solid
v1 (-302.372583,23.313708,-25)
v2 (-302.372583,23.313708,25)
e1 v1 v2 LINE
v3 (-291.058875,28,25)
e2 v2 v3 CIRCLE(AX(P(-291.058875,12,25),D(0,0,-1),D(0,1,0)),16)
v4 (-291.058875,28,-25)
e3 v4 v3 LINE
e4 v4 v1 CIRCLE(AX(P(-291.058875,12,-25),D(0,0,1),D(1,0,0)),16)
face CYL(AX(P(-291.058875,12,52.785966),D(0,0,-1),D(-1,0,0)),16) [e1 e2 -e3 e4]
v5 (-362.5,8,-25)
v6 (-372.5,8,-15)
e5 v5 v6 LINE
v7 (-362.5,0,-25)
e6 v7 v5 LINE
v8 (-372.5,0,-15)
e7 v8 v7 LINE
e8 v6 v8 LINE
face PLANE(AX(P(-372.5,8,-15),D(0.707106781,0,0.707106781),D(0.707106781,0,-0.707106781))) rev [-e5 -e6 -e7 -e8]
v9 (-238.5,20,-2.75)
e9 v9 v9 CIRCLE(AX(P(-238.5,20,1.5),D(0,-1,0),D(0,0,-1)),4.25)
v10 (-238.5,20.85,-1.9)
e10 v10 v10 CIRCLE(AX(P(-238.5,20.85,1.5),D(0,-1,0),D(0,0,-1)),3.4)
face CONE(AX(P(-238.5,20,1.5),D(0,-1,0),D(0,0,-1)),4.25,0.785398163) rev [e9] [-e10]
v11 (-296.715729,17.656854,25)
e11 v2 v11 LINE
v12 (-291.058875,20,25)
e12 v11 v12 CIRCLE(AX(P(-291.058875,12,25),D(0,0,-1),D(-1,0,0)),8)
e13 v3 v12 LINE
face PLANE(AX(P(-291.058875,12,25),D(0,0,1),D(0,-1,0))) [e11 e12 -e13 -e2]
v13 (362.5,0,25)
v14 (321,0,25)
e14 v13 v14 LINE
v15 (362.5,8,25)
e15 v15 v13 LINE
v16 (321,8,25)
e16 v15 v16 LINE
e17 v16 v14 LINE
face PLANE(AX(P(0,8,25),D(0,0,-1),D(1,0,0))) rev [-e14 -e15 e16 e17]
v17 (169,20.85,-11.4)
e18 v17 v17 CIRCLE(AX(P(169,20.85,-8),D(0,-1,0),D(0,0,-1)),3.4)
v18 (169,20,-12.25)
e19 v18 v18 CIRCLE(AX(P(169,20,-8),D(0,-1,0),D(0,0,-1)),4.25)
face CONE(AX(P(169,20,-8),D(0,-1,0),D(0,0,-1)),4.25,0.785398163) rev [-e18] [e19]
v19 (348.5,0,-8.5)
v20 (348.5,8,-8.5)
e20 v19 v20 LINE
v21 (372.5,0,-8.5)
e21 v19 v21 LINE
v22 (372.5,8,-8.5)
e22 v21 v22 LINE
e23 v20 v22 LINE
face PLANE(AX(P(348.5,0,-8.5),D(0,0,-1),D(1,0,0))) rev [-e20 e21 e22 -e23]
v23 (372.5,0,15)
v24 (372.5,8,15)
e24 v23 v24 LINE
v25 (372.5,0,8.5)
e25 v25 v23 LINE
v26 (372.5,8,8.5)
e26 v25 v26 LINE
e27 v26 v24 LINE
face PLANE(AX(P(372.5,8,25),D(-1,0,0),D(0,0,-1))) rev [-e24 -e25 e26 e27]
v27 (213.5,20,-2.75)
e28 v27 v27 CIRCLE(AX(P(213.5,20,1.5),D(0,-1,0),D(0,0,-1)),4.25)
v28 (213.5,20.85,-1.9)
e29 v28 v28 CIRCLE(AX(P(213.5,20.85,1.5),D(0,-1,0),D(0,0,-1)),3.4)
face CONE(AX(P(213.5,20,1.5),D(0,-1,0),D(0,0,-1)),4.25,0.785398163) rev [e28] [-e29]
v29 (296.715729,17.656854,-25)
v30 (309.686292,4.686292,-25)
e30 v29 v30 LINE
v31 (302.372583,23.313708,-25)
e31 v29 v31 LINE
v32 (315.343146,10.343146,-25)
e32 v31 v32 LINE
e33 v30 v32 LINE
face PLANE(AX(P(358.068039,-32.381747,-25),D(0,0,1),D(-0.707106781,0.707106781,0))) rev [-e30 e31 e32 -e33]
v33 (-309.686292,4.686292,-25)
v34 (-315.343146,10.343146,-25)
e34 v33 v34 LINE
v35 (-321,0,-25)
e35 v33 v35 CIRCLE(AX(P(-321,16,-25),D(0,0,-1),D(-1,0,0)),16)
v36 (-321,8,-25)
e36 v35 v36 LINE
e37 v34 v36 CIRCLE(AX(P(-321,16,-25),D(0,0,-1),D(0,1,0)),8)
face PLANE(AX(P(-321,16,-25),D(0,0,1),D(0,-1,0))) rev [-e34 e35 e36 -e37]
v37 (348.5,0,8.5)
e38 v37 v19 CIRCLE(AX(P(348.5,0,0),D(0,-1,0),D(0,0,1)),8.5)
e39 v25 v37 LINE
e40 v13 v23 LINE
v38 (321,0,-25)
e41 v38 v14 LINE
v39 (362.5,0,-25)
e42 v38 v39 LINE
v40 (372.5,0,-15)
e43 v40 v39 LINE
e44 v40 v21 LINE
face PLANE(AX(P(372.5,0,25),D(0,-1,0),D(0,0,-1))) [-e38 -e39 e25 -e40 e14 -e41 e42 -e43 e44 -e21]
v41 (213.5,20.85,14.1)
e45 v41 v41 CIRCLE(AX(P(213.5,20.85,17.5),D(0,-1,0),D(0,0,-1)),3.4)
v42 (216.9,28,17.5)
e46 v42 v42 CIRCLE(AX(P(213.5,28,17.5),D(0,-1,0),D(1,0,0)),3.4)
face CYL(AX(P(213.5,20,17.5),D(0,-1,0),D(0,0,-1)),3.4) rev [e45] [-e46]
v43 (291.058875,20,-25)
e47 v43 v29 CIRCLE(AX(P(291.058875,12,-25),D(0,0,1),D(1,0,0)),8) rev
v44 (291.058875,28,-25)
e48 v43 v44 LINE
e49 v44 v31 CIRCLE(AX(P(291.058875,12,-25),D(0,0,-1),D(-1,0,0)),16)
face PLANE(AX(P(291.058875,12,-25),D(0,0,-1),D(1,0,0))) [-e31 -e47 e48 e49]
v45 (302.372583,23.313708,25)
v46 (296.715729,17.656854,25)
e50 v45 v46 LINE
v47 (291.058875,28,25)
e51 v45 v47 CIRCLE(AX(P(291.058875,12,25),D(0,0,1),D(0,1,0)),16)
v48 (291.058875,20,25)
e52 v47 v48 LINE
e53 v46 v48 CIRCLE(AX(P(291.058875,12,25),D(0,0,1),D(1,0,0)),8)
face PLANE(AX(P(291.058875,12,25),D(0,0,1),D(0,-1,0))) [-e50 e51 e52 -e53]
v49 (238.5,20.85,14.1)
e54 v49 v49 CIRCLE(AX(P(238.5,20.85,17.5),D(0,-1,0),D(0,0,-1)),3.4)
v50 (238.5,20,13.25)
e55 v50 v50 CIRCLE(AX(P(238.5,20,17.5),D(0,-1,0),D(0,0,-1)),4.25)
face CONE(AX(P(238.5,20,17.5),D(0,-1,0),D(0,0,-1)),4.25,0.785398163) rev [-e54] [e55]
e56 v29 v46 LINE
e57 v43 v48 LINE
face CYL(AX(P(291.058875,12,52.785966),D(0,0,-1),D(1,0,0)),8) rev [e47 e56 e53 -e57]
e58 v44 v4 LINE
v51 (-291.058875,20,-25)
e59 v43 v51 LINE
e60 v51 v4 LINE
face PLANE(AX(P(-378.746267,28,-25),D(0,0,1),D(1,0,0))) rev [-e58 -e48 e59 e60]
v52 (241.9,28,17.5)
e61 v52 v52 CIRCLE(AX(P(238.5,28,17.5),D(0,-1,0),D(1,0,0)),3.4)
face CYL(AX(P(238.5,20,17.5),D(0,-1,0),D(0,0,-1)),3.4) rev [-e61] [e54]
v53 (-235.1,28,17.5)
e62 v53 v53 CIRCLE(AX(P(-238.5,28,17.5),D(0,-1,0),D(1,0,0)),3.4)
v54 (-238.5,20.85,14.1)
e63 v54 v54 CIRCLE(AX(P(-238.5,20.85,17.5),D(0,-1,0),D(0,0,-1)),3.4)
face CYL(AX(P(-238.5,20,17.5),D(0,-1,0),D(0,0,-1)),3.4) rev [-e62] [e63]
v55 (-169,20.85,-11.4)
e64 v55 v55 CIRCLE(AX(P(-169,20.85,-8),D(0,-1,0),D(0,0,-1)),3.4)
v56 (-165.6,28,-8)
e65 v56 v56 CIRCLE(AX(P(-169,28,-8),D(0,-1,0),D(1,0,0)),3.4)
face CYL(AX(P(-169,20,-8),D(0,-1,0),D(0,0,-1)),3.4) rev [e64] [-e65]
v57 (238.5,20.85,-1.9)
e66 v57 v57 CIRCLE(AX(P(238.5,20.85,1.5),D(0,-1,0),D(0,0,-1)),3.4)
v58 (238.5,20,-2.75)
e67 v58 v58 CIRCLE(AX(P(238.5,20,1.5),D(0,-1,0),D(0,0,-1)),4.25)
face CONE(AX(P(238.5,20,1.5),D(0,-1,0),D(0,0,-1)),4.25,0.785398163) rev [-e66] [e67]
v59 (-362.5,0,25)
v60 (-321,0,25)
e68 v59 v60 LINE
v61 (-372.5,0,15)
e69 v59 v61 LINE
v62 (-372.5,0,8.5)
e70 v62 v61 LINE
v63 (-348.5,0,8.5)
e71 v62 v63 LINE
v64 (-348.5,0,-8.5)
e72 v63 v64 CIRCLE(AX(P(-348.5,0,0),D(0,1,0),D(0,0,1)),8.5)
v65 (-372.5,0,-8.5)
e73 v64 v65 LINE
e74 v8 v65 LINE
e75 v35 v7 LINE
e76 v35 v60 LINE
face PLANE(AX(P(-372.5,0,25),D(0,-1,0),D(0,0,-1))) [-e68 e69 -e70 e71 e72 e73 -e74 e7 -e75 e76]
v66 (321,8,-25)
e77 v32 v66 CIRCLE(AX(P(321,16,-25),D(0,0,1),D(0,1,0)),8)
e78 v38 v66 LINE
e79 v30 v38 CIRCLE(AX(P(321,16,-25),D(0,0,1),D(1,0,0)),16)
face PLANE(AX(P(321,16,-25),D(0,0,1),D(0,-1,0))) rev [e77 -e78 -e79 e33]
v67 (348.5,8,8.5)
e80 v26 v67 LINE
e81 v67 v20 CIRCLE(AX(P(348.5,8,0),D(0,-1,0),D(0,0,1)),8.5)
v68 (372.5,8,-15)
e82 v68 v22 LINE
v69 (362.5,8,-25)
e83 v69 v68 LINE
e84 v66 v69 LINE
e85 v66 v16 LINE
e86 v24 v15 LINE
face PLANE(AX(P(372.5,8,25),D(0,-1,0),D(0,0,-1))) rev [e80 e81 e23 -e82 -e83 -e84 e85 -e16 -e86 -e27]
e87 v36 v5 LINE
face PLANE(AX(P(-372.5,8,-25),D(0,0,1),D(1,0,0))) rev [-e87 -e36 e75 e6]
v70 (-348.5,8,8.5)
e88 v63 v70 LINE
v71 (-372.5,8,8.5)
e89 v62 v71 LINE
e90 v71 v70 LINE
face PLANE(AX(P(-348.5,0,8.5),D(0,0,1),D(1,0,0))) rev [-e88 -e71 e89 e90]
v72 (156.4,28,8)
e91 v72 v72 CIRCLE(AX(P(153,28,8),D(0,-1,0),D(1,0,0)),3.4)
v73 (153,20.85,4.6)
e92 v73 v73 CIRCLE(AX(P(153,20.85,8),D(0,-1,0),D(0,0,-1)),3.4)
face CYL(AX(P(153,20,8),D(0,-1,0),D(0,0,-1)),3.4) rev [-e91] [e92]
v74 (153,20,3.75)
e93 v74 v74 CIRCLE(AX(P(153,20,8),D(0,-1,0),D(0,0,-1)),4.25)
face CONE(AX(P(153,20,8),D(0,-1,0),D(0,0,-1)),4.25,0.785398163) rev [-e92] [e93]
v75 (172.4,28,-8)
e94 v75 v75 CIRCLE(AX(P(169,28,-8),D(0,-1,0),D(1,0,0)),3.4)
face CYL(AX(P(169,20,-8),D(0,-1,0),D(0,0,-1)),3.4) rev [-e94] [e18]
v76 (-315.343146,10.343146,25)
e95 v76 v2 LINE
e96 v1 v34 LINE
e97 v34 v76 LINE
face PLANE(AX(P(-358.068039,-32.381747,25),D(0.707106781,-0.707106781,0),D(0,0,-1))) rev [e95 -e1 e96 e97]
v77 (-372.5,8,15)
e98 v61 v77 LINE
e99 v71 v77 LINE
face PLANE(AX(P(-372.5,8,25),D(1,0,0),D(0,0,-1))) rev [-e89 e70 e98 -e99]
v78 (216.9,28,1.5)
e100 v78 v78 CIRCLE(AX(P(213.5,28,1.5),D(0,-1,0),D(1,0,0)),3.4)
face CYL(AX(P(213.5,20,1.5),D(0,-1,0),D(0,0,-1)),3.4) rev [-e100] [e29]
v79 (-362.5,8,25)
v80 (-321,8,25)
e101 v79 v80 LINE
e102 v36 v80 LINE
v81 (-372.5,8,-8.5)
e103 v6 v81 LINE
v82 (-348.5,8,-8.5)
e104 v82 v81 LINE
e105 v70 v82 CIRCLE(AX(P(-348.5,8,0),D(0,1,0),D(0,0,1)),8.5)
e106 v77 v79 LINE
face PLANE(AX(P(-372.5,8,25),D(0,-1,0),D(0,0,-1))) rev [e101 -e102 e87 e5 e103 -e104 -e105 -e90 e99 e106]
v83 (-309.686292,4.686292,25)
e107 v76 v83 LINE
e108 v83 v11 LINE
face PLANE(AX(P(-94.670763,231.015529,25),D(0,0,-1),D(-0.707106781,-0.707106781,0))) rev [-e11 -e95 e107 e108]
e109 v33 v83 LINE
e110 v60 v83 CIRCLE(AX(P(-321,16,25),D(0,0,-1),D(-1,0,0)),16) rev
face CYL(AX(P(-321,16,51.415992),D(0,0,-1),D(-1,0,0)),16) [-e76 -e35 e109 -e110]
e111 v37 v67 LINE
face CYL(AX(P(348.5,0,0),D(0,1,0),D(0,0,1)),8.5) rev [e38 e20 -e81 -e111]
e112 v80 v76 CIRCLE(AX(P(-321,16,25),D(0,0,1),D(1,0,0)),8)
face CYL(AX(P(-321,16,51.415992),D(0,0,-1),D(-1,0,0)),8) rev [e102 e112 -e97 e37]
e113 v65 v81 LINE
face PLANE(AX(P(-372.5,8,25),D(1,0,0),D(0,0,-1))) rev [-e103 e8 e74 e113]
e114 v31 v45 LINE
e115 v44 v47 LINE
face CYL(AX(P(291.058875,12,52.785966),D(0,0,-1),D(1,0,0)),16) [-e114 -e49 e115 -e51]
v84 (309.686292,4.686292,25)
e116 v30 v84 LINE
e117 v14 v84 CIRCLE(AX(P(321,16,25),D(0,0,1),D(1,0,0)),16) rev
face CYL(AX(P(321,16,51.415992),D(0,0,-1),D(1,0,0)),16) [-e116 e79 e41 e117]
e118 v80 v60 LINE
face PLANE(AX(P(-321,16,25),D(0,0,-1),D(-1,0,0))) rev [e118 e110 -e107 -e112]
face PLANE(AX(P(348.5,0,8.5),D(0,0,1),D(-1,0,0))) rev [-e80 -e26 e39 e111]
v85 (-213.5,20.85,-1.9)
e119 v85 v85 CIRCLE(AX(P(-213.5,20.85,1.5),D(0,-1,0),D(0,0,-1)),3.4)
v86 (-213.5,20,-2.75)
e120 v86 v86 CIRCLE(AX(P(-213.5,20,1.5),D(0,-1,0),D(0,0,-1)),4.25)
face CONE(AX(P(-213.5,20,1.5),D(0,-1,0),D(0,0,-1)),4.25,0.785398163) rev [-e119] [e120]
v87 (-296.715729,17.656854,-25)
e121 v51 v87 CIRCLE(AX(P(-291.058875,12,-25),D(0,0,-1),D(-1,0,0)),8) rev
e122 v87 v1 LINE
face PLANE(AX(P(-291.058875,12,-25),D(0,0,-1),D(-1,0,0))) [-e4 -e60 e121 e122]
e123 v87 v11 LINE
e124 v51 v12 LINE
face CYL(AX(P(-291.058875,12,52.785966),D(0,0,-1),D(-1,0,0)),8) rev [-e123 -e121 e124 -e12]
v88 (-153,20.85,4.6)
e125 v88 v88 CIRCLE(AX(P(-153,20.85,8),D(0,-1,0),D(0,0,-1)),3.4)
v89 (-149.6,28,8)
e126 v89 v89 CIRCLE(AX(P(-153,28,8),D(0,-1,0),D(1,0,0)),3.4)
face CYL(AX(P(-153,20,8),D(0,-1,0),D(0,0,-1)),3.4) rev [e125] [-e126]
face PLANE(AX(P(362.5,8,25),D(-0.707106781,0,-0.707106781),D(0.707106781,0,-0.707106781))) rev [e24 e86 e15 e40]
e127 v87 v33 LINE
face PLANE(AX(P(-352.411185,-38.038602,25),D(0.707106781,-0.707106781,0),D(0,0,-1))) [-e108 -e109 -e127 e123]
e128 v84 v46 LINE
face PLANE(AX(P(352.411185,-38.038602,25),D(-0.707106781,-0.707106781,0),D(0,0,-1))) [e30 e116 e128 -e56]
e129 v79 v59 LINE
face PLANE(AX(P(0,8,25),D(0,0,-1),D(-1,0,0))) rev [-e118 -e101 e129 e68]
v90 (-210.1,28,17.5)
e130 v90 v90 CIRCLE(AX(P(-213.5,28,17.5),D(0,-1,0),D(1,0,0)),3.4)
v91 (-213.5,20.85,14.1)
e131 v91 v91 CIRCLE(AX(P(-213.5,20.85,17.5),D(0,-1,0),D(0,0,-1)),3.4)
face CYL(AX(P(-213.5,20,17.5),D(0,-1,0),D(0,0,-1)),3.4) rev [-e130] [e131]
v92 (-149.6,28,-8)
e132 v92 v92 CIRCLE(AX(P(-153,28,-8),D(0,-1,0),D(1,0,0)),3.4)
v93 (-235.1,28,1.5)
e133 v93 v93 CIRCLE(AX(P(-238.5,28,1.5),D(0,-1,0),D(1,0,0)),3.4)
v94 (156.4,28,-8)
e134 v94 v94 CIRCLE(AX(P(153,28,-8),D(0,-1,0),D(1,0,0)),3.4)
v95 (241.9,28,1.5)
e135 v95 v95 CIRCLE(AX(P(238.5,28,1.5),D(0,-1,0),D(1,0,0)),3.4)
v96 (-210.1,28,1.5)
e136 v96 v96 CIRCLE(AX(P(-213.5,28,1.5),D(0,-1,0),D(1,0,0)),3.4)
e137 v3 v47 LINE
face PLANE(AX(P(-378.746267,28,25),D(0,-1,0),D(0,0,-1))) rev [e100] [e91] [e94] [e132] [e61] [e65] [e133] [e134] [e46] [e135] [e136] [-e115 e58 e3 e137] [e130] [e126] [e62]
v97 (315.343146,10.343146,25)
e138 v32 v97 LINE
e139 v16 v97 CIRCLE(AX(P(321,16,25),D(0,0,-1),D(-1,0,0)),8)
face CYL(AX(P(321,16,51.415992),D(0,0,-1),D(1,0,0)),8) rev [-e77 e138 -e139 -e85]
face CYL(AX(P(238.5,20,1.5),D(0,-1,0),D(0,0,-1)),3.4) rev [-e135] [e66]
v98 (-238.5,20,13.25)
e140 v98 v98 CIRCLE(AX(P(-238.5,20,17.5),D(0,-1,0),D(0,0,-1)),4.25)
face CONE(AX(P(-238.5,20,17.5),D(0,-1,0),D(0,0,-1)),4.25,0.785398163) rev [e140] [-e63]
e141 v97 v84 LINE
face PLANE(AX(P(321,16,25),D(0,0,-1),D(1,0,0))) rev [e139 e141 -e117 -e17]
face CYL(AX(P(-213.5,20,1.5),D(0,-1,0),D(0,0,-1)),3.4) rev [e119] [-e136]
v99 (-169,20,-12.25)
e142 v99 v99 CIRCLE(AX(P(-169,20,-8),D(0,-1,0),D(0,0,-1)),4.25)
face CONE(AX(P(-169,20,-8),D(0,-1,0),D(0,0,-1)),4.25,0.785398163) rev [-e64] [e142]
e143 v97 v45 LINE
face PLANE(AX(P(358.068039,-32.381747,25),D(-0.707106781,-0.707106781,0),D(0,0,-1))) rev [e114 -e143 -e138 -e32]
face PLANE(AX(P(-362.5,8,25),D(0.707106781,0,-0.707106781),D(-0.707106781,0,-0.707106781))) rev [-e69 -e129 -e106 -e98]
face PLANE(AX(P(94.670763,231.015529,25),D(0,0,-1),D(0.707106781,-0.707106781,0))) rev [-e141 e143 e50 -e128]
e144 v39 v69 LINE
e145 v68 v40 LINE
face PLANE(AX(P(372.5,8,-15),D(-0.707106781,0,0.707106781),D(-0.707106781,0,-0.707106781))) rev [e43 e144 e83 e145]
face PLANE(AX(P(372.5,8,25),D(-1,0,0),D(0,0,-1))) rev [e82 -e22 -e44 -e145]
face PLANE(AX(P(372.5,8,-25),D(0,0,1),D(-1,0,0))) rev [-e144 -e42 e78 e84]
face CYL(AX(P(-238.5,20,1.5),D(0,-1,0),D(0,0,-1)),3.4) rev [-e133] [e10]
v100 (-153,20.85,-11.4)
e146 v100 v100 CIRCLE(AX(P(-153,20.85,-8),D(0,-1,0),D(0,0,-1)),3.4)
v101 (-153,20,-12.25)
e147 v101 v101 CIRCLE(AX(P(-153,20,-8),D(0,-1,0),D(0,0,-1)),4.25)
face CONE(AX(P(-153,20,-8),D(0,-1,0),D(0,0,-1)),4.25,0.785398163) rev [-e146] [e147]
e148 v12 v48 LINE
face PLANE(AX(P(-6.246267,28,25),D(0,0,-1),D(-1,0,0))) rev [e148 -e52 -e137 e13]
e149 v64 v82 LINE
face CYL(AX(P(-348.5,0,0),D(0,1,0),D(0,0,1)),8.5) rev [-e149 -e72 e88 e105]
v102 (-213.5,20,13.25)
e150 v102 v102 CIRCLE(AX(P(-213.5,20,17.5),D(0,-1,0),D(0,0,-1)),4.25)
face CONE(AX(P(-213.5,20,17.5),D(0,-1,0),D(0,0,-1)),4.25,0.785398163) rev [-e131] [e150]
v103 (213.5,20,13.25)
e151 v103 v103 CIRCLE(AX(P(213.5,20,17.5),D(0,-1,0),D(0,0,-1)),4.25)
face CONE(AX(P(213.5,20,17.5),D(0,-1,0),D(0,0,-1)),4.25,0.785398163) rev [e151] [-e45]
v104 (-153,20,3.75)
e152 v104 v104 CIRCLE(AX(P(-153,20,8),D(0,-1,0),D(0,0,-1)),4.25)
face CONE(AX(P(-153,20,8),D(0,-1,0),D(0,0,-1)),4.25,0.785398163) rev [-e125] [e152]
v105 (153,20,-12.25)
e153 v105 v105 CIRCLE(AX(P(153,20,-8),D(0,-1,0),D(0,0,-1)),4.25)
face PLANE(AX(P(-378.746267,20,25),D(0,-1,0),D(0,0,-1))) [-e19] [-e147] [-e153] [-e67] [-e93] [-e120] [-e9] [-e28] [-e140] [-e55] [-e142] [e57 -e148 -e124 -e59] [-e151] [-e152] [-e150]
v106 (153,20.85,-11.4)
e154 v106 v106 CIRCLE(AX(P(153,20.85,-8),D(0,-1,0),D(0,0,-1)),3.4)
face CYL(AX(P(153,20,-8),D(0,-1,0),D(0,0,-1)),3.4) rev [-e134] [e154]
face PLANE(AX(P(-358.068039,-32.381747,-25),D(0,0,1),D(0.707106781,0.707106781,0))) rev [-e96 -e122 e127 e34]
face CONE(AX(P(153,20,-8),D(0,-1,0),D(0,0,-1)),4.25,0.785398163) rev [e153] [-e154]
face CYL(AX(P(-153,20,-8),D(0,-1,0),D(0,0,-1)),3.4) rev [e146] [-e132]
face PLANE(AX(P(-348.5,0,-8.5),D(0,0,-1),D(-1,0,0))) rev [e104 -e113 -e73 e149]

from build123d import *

# Parameters (mm, degrees)
SKETCH_1_W             = 372.5
SKETCH_1_H             = 50
SM_BASE_FLANGE_1_DEPTH = 8
OTHER_START            = -25
OTHER_1_DEPTH          = 50
OTHER_1_2_DEPTH        = 50
CHAMFER_1_SIZE         = 10
CUT_EXTRUDE_1_DEPTH    = 374.873307418
M8X1_251_D             = 6.8
M8X1_251_CSINK_D       = 8.5
M8X1_251_CSINK_ANGLE   = 90


# Read off the part's stored shape, not the designer's step: Изгиб1
# Sheet-metal steps are written as plain solids
with BuildPart() as part:
    # Sketch 1 → Базовая кромка1 (new body)
    with BuildSketch(Plane(origin=(0, 0, 0), x_dir=(1, 0, 0), z_dir=(0, 1, 0))):
        with Locations((-186.25, 0)):
            Rectangle(SKETCH_1_W, SKETCH_1_H)
    extrude(amount=SM_BASE_FLANGE_1_DEPTH)

    # Other 1 outline → Other 1 (cut)
    with BuildSketch(Plane.XY.offset(OTHER_START)):
        with BuildLine():
            Line((-306.372583002, 8), (-309.68629166, 4.68629166))
            ThreePointArc((-309.68629166, 4.68629166), (-314.877065168, 1.217927687), (-321, 2.25e-07))
            Line((-321, 2.25e-07), (0, 0))
            Line((0, 0), (0, 8))
            Line((0, 8), (-306.372583002, 8))
        make_face()
    extrude(amount=OTHER_1_DEPTH, mode=Mode.SUBTRACT)

    # Other 1 2 outline → Other 1 2 (add)
    with BuildSketch(Plane.XY.offset(OTHER_START)):
        with BuildLine():
            Line((-321, 8.000000225), (-306.372583002, 8))
            Line((-306.372583002, 8), (-296.715728655, 17.656854152))
            ThreePointArc((-296.715728655, 17.656854152), (-294.120341909, 19.391036132), (-291.058874503, 19.999999862))
            Line((-291.058874503, 19.999999862), (0, 20))
            Line((0, 20), (0, 28))
            Line((0, 28), (-291.058874503, 27.999999862))
            ThreePointArc((-291.058874503, 27.999999862), (-297.181809368, 26.782072393), (-302.372582904, 23.313708401))
            Line((-302.372582904, 23.313708401), (-315.343145909, 10.343145909))
            ThreePointArc((-315.343145909, 10.343145909), (-317.938532627, 8.608963948), (-321, 8.000000225))
        make_face()
    extrude(amount=OTHER_1_2_DEPTH)

    # Фаска1
    chamfer_1_edges = [part.edges().sort_by_distance(p)[0] for p in [
        (-372.5, 4, -25),
        (-372.5, 4, 25),
    ]]
    chamfer(chamfer_1_edges, length=CHAMFER_1_SIZE)

    # Эскиз4 → Вытянуть1 (cut, through all)
    with BuildSketch(Plane(origin=(0, 8, 0), x_dir=(1, 0, 0), z_dir=(0, 1, 0))):
        with BuildLine():
            Line((-348.5, 8.5), (-372.5, 8.5))
            Line((-372.5, 8.5), (-372.5, -8.5))
            Line((-372.5, -8.5), (-348.5, -8.5))
            ThreePointArc((-348.5, -8.5), (-340, 0), (-348.5, 8.5))
        make_face()
    extrude(amount=-CUT_EXTRUDE_1_DEPTH, mode=Mode.SUBTRACT)

    # Зеркальное отражение1: part across plane


with BuildPart() as part_1:
    add(part.part)
    add(part.part.mirror(Plane(origin=(0, 28, -25), x_dir=(0, 0, 1), z_dir=(-1, 0, 0))))

    # Отверстие обработанное метчиком M8x1.251 (through all)
    with Locations(Plane.XZ.offset(-20)):
        with Locations((-238.5, 17.5), (-238.5, 1.5), (-213.5, 1.5), (-213.5, 17.5), (-153, -8), (-153, 8), (-169, -8), (213.5, 1.5), (238.5, 1.5), (238.5, 17.5), (213.5, 17.5), (169, -8), (153, -8), (153, 8)):
            CounterSinkHole(M8X1_251_D / 2, M8X1_251_CSINK_D / 2, counter_sink_angle=M8X1_251_CSINK_ANGLE)


solid = part_1.part
